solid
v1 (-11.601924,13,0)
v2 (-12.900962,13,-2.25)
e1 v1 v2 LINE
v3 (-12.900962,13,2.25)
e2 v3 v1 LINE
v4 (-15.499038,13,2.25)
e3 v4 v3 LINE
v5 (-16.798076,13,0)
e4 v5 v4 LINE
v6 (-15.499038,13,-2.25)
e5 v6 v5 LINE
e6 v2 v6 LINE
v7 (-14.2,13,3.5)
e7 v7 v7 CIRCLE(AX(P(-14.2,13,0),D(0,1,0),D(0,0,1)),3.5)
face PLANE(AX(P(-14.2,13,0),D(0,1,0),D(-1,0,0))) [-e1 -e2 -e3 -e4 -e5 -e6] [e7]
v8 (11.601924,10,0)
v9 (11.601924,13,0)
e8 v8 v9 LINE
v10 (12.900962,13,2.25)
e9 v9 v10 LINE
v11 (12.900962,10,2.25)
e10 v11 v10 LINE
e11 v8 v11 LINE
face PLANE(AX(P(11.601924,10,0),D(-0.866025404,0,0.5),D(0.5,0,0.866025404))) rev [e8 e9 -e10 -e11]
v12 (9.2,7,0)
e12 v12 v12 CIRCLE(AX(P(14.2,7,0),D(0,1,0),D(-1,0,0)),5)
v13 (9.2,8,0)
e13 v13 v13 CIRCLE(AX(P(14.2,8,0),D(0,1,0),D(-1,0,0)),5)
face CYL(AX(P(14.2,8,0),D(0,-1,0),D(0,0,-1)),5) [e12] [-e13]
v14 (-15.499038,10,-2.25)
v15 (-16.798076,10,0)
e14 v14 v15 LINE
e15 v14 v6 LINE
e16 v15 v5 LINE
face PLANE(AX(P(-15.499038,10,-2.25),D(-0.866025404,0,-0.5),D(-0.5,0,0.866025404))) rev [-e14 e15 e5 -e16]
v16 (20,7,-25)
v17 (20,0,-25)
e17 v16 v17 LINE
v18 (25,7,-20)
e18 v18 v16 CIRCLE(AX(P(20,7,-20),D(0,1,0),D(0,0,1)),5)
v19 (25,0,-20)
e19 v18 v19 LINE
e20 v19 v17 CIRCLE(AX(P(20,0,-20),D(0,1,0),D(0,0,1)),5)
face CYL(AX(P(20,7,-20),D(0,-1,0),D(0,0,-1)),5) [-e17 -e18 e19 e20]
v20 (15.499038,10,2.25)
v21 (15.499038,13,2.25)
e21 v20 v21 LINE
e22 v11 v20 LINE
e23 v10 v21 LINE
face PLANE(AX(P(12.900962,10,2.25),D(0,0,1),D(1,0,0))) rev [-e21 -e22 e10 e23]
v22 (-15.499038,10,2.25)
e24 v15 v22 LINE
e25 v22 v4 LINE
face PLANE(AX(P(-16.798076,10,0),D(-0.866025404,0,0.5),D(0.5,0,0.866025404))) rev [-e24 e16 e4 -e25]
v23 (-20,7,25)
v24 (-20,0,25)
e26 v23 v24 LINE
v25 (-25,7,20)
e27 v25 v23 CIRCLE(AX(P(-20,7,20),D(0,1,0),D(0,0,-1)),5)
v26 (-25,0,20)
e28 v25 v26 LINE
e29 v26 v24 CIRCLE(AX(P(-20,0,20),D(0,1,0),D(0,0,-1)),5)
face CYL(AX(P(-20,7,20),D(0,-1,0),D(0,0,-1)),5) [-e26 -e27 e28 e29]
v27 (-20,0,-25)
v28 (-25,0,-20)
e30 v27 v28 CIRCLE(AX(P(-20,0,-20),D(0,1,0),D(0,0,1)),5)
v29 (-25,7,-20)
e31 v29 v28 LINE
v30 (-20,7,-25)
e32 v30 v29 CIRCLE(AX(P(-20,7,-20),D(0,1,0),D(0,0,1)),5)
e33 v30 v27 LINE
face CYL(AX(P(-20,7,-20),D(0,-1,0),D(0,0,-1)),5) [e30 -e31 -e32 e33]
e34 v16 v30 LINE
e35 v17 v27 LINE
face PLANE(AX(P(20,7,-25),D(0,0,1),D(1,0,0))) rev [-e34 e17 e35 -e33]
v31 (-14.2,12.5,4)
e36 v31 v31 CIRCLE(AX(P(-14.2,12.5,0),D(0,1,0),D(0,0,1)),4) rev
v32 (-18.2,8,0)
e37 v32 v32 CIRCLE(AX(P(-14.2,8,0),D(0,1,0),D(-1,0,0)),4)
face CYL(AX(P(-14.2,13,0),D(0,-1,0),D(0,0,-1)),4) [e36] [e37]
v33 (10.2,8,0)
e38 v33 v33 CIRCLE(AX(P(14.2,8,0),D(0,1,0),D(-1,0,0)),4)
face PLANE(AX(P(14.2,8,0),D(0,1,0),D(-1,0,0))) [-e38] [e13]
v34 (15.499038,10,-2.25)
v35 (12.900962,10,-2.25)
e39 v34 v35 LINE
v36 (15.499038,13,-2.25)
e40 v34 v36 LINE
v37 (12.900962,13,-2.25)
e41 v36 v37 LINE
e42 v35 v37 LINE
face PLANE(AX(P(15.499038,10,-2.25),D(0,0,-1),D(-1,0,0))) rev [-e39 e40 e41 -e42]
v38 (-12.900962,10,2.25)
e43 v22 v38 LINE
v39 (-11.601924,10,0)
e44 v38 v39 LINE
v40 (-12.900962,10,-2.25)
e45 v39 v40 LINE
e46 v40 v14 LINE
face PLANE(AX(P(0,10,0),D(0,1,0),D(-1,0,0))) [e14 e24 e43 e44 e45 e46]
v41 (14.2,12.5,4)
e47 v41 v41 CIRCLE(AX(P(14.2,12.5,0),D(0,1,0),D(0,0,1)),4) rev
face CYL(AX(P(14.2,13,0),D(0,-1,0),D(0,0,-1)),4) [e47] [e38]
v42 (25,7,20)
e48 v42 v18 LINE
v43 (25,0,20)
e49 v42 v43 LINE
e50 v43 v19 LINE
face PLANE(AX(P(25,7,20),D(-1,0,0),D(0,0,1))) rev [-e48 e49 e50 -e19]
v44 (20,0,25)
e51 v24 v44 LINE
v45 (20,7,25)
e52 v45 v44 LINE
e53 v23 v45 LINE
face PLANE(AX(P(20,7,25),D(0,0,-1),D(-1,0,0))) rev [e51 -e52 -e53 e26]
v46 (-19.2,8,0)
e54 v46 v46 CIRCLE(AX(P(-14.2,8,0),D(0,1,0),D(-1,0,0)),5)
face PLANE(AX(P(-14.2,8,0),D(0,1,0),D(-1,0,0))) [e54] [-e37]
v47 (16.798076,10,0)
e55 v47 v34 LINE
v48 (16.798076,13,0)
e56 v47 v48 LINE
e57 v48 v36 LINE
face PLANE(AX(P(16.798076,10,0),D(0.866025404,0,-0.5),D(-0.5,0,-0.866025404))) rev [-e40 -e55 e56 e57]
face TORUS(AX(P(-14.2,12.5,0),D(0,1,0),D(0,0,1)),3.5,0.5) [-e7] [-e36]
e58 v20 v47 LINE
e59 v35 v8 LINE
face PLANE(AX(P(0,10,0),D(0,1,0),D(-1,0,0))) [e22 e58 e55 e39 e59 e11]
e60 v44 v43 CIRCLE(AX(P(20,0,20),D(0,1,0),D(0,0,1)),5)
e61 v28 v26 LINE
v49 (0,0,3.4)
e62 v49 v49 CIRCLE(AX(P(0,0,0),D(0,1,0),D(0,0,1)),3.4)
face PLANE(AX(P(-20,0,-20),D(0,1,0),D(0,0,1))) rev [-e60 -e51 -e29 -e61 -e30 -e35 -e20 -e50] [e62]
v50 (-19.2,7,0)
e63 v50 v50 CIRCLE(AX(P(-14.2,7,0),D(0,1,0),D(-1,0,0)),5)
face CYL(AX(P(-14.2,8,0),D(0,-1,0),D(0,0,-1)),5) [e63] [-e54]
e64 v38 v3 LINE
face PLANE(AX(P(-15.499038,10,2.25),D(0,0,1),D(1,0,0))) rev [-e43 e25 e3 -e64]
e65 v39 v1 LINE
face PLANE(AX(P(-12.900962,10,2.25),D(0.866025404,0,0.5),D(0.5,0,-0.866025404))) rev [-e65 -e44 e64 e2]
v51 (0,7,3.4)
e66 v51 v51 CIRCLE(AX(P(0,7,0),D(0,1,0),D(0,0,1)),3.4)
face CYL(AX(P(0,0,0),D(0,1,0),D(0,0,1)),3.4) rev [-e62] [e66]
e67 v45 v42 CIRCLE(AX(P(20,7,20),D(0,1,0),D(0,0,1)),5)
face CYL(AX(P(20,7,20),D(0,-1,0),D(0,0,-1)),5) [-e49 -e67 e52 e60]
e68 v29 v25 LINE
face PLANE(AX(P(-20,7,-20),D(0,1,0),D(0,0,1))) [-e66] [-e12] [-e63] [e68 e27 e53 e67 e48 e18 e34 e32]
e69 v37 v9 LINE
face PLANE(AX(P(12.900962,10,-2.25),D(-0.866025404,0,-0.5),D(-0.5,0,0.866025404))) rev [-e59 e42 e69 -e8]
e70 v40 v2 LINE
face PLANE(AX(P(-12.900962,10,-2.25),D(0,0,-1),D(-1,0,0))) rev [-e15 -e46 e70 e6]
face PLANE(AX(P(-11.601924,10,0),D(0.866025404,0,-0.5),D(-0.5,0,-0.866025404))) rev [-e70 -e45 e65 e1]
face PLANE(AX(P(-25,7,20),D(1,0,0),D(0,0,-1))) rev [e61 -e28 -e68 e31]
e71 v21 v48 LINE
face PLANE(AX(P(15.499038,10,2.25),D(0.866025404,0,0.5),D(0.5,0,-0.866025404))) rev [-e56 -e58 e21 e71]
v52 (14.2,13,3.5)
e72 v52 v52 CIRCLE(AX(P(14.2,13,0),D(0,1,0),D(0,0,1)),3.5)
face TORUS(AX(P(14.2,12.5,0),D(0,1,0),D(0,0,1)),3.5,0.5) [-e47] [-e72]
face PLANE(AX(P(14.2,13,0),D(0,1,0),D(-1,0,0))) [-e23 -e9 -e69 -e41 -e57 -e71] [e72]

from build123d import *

# Parameters (mm, degrees)
SKETCH1_R                = 3.4
BOSS_EXTRUDE1_DEPTH      = 7
SKETCH4_R                = 5
BOSS_EXTRUDE2_DEPTH      = 1
SKETCH5_R                = 4
BOSS_EXTRUDE3_DEPTH      = 5
CUT_EXTRUDE1_DEPTH       = 3
FILLET1_R                = 0.5
CIRPATTERN1_COUNT        = 2
CIRPATTERN1_ANGLE        = 90
FILLET1_OF_CIRPATTERN1_R = 0.5
SKETCH7_W                = 13.377916116
SKETCH7_H                = 10.003544581
SKETCH7_W_2              = 13.109283262
SKETCH7_H_2              = 10.863169713
CUT_EXTRUDE2_DEPTH       = 58.393379409


# Read off the part's stored shape, not the designer's step: Imported1
with BuildPart() as part:
    # Sketch1 → Boss-Extrude1 (new body)
    with BuildSketch(Plane(origin=(0, 7, 0), x_dir=(1, 0, 0), z_dir=(0, 1, 0))):
        with BuildLine():
            Line((-25, 20), (-25, -20))
            ThreePointArc((-25, -20), (-23.535533906, -23.535533906), (-20, -25))
            Line((-20, -25), (20, -25))
            ThreePointArc((20, -25), (23.535533906, -23.535533906), (25, -20))
            Line((25, -20), (25, 20))
            ThreePointArc((25, 20), (23.535533906, 23.535533906), (20, 25))
            Line((20, 25), (-20, 25))
            ThreePointArc((-20, 25), (-23.535533906, 23.535533906), (-25, 20))
        make_face()
        with Locations(Location((0, 0, 0), (0, 0, 270))):
            Circle(SKETCH1_R, mode=Mode.SUBTRACT)
    extrude(amount=-BOSS_EXTRUDE1_DEPTH)

    # Sketch4 → Boss-Extrude2 (add)
    with BuildSketch(Plane(origin=(0, 7, 0), x_dir=(1, 0, 0), z_dir=(0, 1, 0))):
        with Locations(Location((0, 14.2, 0), (0, 0, 270))):
            Circle(SKETCH4_R)
        with Locations(Location((0, -14.2, 0), (0, 0, 270))):
            Circle(SKETCH4_R)
    boss_extrude2 = extrude(amount=BOSS_EXTRUDE2_DEPTH)

    # Sketch5 → Boss-Extrude3 (add)
    with BuildSketch(Plane(origin=(0, 8, 0), x_dir=(1, 0, 0), z_dir=(0, 1, 0))):
        with Locations(Location((0, 14.2, 0), (0, 0, 270))):
            Circle(SKETCH5_R)
        with Locations(Location((0, -14.2, 0), (0, 0, 270))):
            Circle(SKETCH5_R)
    boss_extrude3 = extrude(amount=BOSS_EXTRUDE3_DEPTH)

    # Sketch6 → Cut-Extrude1 (cut)
    with BuildSketch(Plane(origin=(0, 13, 0), x_dir=(1, 0, 0), z_dir=(0, 1, 0))):
        Polygon((0, 16.798076211), (-2.25, 15.499038106), (-2.25, 12.900961894), (0, 11.601923789), (2.25, 12.900961894), (2.25, 15.499038106), align=None)
        Polygon((0, -11.601923789), (-2.25, -12.900961894), (-2.25, -15.499038106), (0, -16.798076211), (2.25, -15.499038106), (2.25, -12.900961894), align=None)
    cut_extrude1 = extrude(amount=-CUT_EXTRUDE1_DEPTH, mode=Mode.SUBTRACT)

    # Fillet1
    fillet1_edges = [part.edges().sort_by_distance(p)[0] for p in [
        (0, 13, -18.2),
        (0, 13, 10.2),
    ]]
    fillet(fillet1_edges, radius=FILLET1_R)

    # CirPattern1: Boss-Extrude2, Boss-Extrude3, Cut-Extrude1 ×2 about axis
    cirpattern1_axis = Axis((0, 0, 0), (0, -1, 0))
    add([boss_extrude2.rotate(cirpattern1_axis, i * CIRPATTERN1_ANGLE / (CIRPATTERN1_COUNT - 1)) for i in range(1, CIRPATTERN1_COUNT)])
    add([boss_extrude3.rotate(cirpattern1_axis, i * CIRPATTERN1_ANGLE / (CIRPATTERN1_COUNT - 1)) for i in range(1, CIRPATTERN1_COUNT)])
    add([cut_extrude1.rotate(cirpattern1_axis, i * CIRPATTERN1_ANGLE / (CIRPATTERN1_COUNT - 1)) for i in range(1, CIRPATTERN1_COUNT)], mode=Mode.SUBTRACT)

    # Fillet1 of CirPattern1
    fillet1_of_cirpattern1_edges = [part.edges().sort_by_distance(p)[0] for p in [
        (18.2, 13, 0),
        (-10.2, 13, 0),
    ]]
    fillet(fillet1_of_cirpattern1_edges, radius=FILLET1_OF_CIRPATTERN1_R)

    # Sketch7 → Cut-Extrude2 (cut, through all)
    with BuildSketch(Plane(origin=(25, 0, 0), x_dir=(0, 0, -1), z_dir=(1, 0, 0))):
        with Locations((14.04949825, 12.00177229)):
            Rectangle(SKETCH7_W, SKETCH7_H)
        with Locations((-13.592822399, 12.431584857)):
            Rectangle(SKETCH7_W_2, SKETCH7_H_2)
    extrude(amount=-CUT_EXTRUDE2_DEPTH, mode=Mode.SUBTRACT)


solid = part.part
